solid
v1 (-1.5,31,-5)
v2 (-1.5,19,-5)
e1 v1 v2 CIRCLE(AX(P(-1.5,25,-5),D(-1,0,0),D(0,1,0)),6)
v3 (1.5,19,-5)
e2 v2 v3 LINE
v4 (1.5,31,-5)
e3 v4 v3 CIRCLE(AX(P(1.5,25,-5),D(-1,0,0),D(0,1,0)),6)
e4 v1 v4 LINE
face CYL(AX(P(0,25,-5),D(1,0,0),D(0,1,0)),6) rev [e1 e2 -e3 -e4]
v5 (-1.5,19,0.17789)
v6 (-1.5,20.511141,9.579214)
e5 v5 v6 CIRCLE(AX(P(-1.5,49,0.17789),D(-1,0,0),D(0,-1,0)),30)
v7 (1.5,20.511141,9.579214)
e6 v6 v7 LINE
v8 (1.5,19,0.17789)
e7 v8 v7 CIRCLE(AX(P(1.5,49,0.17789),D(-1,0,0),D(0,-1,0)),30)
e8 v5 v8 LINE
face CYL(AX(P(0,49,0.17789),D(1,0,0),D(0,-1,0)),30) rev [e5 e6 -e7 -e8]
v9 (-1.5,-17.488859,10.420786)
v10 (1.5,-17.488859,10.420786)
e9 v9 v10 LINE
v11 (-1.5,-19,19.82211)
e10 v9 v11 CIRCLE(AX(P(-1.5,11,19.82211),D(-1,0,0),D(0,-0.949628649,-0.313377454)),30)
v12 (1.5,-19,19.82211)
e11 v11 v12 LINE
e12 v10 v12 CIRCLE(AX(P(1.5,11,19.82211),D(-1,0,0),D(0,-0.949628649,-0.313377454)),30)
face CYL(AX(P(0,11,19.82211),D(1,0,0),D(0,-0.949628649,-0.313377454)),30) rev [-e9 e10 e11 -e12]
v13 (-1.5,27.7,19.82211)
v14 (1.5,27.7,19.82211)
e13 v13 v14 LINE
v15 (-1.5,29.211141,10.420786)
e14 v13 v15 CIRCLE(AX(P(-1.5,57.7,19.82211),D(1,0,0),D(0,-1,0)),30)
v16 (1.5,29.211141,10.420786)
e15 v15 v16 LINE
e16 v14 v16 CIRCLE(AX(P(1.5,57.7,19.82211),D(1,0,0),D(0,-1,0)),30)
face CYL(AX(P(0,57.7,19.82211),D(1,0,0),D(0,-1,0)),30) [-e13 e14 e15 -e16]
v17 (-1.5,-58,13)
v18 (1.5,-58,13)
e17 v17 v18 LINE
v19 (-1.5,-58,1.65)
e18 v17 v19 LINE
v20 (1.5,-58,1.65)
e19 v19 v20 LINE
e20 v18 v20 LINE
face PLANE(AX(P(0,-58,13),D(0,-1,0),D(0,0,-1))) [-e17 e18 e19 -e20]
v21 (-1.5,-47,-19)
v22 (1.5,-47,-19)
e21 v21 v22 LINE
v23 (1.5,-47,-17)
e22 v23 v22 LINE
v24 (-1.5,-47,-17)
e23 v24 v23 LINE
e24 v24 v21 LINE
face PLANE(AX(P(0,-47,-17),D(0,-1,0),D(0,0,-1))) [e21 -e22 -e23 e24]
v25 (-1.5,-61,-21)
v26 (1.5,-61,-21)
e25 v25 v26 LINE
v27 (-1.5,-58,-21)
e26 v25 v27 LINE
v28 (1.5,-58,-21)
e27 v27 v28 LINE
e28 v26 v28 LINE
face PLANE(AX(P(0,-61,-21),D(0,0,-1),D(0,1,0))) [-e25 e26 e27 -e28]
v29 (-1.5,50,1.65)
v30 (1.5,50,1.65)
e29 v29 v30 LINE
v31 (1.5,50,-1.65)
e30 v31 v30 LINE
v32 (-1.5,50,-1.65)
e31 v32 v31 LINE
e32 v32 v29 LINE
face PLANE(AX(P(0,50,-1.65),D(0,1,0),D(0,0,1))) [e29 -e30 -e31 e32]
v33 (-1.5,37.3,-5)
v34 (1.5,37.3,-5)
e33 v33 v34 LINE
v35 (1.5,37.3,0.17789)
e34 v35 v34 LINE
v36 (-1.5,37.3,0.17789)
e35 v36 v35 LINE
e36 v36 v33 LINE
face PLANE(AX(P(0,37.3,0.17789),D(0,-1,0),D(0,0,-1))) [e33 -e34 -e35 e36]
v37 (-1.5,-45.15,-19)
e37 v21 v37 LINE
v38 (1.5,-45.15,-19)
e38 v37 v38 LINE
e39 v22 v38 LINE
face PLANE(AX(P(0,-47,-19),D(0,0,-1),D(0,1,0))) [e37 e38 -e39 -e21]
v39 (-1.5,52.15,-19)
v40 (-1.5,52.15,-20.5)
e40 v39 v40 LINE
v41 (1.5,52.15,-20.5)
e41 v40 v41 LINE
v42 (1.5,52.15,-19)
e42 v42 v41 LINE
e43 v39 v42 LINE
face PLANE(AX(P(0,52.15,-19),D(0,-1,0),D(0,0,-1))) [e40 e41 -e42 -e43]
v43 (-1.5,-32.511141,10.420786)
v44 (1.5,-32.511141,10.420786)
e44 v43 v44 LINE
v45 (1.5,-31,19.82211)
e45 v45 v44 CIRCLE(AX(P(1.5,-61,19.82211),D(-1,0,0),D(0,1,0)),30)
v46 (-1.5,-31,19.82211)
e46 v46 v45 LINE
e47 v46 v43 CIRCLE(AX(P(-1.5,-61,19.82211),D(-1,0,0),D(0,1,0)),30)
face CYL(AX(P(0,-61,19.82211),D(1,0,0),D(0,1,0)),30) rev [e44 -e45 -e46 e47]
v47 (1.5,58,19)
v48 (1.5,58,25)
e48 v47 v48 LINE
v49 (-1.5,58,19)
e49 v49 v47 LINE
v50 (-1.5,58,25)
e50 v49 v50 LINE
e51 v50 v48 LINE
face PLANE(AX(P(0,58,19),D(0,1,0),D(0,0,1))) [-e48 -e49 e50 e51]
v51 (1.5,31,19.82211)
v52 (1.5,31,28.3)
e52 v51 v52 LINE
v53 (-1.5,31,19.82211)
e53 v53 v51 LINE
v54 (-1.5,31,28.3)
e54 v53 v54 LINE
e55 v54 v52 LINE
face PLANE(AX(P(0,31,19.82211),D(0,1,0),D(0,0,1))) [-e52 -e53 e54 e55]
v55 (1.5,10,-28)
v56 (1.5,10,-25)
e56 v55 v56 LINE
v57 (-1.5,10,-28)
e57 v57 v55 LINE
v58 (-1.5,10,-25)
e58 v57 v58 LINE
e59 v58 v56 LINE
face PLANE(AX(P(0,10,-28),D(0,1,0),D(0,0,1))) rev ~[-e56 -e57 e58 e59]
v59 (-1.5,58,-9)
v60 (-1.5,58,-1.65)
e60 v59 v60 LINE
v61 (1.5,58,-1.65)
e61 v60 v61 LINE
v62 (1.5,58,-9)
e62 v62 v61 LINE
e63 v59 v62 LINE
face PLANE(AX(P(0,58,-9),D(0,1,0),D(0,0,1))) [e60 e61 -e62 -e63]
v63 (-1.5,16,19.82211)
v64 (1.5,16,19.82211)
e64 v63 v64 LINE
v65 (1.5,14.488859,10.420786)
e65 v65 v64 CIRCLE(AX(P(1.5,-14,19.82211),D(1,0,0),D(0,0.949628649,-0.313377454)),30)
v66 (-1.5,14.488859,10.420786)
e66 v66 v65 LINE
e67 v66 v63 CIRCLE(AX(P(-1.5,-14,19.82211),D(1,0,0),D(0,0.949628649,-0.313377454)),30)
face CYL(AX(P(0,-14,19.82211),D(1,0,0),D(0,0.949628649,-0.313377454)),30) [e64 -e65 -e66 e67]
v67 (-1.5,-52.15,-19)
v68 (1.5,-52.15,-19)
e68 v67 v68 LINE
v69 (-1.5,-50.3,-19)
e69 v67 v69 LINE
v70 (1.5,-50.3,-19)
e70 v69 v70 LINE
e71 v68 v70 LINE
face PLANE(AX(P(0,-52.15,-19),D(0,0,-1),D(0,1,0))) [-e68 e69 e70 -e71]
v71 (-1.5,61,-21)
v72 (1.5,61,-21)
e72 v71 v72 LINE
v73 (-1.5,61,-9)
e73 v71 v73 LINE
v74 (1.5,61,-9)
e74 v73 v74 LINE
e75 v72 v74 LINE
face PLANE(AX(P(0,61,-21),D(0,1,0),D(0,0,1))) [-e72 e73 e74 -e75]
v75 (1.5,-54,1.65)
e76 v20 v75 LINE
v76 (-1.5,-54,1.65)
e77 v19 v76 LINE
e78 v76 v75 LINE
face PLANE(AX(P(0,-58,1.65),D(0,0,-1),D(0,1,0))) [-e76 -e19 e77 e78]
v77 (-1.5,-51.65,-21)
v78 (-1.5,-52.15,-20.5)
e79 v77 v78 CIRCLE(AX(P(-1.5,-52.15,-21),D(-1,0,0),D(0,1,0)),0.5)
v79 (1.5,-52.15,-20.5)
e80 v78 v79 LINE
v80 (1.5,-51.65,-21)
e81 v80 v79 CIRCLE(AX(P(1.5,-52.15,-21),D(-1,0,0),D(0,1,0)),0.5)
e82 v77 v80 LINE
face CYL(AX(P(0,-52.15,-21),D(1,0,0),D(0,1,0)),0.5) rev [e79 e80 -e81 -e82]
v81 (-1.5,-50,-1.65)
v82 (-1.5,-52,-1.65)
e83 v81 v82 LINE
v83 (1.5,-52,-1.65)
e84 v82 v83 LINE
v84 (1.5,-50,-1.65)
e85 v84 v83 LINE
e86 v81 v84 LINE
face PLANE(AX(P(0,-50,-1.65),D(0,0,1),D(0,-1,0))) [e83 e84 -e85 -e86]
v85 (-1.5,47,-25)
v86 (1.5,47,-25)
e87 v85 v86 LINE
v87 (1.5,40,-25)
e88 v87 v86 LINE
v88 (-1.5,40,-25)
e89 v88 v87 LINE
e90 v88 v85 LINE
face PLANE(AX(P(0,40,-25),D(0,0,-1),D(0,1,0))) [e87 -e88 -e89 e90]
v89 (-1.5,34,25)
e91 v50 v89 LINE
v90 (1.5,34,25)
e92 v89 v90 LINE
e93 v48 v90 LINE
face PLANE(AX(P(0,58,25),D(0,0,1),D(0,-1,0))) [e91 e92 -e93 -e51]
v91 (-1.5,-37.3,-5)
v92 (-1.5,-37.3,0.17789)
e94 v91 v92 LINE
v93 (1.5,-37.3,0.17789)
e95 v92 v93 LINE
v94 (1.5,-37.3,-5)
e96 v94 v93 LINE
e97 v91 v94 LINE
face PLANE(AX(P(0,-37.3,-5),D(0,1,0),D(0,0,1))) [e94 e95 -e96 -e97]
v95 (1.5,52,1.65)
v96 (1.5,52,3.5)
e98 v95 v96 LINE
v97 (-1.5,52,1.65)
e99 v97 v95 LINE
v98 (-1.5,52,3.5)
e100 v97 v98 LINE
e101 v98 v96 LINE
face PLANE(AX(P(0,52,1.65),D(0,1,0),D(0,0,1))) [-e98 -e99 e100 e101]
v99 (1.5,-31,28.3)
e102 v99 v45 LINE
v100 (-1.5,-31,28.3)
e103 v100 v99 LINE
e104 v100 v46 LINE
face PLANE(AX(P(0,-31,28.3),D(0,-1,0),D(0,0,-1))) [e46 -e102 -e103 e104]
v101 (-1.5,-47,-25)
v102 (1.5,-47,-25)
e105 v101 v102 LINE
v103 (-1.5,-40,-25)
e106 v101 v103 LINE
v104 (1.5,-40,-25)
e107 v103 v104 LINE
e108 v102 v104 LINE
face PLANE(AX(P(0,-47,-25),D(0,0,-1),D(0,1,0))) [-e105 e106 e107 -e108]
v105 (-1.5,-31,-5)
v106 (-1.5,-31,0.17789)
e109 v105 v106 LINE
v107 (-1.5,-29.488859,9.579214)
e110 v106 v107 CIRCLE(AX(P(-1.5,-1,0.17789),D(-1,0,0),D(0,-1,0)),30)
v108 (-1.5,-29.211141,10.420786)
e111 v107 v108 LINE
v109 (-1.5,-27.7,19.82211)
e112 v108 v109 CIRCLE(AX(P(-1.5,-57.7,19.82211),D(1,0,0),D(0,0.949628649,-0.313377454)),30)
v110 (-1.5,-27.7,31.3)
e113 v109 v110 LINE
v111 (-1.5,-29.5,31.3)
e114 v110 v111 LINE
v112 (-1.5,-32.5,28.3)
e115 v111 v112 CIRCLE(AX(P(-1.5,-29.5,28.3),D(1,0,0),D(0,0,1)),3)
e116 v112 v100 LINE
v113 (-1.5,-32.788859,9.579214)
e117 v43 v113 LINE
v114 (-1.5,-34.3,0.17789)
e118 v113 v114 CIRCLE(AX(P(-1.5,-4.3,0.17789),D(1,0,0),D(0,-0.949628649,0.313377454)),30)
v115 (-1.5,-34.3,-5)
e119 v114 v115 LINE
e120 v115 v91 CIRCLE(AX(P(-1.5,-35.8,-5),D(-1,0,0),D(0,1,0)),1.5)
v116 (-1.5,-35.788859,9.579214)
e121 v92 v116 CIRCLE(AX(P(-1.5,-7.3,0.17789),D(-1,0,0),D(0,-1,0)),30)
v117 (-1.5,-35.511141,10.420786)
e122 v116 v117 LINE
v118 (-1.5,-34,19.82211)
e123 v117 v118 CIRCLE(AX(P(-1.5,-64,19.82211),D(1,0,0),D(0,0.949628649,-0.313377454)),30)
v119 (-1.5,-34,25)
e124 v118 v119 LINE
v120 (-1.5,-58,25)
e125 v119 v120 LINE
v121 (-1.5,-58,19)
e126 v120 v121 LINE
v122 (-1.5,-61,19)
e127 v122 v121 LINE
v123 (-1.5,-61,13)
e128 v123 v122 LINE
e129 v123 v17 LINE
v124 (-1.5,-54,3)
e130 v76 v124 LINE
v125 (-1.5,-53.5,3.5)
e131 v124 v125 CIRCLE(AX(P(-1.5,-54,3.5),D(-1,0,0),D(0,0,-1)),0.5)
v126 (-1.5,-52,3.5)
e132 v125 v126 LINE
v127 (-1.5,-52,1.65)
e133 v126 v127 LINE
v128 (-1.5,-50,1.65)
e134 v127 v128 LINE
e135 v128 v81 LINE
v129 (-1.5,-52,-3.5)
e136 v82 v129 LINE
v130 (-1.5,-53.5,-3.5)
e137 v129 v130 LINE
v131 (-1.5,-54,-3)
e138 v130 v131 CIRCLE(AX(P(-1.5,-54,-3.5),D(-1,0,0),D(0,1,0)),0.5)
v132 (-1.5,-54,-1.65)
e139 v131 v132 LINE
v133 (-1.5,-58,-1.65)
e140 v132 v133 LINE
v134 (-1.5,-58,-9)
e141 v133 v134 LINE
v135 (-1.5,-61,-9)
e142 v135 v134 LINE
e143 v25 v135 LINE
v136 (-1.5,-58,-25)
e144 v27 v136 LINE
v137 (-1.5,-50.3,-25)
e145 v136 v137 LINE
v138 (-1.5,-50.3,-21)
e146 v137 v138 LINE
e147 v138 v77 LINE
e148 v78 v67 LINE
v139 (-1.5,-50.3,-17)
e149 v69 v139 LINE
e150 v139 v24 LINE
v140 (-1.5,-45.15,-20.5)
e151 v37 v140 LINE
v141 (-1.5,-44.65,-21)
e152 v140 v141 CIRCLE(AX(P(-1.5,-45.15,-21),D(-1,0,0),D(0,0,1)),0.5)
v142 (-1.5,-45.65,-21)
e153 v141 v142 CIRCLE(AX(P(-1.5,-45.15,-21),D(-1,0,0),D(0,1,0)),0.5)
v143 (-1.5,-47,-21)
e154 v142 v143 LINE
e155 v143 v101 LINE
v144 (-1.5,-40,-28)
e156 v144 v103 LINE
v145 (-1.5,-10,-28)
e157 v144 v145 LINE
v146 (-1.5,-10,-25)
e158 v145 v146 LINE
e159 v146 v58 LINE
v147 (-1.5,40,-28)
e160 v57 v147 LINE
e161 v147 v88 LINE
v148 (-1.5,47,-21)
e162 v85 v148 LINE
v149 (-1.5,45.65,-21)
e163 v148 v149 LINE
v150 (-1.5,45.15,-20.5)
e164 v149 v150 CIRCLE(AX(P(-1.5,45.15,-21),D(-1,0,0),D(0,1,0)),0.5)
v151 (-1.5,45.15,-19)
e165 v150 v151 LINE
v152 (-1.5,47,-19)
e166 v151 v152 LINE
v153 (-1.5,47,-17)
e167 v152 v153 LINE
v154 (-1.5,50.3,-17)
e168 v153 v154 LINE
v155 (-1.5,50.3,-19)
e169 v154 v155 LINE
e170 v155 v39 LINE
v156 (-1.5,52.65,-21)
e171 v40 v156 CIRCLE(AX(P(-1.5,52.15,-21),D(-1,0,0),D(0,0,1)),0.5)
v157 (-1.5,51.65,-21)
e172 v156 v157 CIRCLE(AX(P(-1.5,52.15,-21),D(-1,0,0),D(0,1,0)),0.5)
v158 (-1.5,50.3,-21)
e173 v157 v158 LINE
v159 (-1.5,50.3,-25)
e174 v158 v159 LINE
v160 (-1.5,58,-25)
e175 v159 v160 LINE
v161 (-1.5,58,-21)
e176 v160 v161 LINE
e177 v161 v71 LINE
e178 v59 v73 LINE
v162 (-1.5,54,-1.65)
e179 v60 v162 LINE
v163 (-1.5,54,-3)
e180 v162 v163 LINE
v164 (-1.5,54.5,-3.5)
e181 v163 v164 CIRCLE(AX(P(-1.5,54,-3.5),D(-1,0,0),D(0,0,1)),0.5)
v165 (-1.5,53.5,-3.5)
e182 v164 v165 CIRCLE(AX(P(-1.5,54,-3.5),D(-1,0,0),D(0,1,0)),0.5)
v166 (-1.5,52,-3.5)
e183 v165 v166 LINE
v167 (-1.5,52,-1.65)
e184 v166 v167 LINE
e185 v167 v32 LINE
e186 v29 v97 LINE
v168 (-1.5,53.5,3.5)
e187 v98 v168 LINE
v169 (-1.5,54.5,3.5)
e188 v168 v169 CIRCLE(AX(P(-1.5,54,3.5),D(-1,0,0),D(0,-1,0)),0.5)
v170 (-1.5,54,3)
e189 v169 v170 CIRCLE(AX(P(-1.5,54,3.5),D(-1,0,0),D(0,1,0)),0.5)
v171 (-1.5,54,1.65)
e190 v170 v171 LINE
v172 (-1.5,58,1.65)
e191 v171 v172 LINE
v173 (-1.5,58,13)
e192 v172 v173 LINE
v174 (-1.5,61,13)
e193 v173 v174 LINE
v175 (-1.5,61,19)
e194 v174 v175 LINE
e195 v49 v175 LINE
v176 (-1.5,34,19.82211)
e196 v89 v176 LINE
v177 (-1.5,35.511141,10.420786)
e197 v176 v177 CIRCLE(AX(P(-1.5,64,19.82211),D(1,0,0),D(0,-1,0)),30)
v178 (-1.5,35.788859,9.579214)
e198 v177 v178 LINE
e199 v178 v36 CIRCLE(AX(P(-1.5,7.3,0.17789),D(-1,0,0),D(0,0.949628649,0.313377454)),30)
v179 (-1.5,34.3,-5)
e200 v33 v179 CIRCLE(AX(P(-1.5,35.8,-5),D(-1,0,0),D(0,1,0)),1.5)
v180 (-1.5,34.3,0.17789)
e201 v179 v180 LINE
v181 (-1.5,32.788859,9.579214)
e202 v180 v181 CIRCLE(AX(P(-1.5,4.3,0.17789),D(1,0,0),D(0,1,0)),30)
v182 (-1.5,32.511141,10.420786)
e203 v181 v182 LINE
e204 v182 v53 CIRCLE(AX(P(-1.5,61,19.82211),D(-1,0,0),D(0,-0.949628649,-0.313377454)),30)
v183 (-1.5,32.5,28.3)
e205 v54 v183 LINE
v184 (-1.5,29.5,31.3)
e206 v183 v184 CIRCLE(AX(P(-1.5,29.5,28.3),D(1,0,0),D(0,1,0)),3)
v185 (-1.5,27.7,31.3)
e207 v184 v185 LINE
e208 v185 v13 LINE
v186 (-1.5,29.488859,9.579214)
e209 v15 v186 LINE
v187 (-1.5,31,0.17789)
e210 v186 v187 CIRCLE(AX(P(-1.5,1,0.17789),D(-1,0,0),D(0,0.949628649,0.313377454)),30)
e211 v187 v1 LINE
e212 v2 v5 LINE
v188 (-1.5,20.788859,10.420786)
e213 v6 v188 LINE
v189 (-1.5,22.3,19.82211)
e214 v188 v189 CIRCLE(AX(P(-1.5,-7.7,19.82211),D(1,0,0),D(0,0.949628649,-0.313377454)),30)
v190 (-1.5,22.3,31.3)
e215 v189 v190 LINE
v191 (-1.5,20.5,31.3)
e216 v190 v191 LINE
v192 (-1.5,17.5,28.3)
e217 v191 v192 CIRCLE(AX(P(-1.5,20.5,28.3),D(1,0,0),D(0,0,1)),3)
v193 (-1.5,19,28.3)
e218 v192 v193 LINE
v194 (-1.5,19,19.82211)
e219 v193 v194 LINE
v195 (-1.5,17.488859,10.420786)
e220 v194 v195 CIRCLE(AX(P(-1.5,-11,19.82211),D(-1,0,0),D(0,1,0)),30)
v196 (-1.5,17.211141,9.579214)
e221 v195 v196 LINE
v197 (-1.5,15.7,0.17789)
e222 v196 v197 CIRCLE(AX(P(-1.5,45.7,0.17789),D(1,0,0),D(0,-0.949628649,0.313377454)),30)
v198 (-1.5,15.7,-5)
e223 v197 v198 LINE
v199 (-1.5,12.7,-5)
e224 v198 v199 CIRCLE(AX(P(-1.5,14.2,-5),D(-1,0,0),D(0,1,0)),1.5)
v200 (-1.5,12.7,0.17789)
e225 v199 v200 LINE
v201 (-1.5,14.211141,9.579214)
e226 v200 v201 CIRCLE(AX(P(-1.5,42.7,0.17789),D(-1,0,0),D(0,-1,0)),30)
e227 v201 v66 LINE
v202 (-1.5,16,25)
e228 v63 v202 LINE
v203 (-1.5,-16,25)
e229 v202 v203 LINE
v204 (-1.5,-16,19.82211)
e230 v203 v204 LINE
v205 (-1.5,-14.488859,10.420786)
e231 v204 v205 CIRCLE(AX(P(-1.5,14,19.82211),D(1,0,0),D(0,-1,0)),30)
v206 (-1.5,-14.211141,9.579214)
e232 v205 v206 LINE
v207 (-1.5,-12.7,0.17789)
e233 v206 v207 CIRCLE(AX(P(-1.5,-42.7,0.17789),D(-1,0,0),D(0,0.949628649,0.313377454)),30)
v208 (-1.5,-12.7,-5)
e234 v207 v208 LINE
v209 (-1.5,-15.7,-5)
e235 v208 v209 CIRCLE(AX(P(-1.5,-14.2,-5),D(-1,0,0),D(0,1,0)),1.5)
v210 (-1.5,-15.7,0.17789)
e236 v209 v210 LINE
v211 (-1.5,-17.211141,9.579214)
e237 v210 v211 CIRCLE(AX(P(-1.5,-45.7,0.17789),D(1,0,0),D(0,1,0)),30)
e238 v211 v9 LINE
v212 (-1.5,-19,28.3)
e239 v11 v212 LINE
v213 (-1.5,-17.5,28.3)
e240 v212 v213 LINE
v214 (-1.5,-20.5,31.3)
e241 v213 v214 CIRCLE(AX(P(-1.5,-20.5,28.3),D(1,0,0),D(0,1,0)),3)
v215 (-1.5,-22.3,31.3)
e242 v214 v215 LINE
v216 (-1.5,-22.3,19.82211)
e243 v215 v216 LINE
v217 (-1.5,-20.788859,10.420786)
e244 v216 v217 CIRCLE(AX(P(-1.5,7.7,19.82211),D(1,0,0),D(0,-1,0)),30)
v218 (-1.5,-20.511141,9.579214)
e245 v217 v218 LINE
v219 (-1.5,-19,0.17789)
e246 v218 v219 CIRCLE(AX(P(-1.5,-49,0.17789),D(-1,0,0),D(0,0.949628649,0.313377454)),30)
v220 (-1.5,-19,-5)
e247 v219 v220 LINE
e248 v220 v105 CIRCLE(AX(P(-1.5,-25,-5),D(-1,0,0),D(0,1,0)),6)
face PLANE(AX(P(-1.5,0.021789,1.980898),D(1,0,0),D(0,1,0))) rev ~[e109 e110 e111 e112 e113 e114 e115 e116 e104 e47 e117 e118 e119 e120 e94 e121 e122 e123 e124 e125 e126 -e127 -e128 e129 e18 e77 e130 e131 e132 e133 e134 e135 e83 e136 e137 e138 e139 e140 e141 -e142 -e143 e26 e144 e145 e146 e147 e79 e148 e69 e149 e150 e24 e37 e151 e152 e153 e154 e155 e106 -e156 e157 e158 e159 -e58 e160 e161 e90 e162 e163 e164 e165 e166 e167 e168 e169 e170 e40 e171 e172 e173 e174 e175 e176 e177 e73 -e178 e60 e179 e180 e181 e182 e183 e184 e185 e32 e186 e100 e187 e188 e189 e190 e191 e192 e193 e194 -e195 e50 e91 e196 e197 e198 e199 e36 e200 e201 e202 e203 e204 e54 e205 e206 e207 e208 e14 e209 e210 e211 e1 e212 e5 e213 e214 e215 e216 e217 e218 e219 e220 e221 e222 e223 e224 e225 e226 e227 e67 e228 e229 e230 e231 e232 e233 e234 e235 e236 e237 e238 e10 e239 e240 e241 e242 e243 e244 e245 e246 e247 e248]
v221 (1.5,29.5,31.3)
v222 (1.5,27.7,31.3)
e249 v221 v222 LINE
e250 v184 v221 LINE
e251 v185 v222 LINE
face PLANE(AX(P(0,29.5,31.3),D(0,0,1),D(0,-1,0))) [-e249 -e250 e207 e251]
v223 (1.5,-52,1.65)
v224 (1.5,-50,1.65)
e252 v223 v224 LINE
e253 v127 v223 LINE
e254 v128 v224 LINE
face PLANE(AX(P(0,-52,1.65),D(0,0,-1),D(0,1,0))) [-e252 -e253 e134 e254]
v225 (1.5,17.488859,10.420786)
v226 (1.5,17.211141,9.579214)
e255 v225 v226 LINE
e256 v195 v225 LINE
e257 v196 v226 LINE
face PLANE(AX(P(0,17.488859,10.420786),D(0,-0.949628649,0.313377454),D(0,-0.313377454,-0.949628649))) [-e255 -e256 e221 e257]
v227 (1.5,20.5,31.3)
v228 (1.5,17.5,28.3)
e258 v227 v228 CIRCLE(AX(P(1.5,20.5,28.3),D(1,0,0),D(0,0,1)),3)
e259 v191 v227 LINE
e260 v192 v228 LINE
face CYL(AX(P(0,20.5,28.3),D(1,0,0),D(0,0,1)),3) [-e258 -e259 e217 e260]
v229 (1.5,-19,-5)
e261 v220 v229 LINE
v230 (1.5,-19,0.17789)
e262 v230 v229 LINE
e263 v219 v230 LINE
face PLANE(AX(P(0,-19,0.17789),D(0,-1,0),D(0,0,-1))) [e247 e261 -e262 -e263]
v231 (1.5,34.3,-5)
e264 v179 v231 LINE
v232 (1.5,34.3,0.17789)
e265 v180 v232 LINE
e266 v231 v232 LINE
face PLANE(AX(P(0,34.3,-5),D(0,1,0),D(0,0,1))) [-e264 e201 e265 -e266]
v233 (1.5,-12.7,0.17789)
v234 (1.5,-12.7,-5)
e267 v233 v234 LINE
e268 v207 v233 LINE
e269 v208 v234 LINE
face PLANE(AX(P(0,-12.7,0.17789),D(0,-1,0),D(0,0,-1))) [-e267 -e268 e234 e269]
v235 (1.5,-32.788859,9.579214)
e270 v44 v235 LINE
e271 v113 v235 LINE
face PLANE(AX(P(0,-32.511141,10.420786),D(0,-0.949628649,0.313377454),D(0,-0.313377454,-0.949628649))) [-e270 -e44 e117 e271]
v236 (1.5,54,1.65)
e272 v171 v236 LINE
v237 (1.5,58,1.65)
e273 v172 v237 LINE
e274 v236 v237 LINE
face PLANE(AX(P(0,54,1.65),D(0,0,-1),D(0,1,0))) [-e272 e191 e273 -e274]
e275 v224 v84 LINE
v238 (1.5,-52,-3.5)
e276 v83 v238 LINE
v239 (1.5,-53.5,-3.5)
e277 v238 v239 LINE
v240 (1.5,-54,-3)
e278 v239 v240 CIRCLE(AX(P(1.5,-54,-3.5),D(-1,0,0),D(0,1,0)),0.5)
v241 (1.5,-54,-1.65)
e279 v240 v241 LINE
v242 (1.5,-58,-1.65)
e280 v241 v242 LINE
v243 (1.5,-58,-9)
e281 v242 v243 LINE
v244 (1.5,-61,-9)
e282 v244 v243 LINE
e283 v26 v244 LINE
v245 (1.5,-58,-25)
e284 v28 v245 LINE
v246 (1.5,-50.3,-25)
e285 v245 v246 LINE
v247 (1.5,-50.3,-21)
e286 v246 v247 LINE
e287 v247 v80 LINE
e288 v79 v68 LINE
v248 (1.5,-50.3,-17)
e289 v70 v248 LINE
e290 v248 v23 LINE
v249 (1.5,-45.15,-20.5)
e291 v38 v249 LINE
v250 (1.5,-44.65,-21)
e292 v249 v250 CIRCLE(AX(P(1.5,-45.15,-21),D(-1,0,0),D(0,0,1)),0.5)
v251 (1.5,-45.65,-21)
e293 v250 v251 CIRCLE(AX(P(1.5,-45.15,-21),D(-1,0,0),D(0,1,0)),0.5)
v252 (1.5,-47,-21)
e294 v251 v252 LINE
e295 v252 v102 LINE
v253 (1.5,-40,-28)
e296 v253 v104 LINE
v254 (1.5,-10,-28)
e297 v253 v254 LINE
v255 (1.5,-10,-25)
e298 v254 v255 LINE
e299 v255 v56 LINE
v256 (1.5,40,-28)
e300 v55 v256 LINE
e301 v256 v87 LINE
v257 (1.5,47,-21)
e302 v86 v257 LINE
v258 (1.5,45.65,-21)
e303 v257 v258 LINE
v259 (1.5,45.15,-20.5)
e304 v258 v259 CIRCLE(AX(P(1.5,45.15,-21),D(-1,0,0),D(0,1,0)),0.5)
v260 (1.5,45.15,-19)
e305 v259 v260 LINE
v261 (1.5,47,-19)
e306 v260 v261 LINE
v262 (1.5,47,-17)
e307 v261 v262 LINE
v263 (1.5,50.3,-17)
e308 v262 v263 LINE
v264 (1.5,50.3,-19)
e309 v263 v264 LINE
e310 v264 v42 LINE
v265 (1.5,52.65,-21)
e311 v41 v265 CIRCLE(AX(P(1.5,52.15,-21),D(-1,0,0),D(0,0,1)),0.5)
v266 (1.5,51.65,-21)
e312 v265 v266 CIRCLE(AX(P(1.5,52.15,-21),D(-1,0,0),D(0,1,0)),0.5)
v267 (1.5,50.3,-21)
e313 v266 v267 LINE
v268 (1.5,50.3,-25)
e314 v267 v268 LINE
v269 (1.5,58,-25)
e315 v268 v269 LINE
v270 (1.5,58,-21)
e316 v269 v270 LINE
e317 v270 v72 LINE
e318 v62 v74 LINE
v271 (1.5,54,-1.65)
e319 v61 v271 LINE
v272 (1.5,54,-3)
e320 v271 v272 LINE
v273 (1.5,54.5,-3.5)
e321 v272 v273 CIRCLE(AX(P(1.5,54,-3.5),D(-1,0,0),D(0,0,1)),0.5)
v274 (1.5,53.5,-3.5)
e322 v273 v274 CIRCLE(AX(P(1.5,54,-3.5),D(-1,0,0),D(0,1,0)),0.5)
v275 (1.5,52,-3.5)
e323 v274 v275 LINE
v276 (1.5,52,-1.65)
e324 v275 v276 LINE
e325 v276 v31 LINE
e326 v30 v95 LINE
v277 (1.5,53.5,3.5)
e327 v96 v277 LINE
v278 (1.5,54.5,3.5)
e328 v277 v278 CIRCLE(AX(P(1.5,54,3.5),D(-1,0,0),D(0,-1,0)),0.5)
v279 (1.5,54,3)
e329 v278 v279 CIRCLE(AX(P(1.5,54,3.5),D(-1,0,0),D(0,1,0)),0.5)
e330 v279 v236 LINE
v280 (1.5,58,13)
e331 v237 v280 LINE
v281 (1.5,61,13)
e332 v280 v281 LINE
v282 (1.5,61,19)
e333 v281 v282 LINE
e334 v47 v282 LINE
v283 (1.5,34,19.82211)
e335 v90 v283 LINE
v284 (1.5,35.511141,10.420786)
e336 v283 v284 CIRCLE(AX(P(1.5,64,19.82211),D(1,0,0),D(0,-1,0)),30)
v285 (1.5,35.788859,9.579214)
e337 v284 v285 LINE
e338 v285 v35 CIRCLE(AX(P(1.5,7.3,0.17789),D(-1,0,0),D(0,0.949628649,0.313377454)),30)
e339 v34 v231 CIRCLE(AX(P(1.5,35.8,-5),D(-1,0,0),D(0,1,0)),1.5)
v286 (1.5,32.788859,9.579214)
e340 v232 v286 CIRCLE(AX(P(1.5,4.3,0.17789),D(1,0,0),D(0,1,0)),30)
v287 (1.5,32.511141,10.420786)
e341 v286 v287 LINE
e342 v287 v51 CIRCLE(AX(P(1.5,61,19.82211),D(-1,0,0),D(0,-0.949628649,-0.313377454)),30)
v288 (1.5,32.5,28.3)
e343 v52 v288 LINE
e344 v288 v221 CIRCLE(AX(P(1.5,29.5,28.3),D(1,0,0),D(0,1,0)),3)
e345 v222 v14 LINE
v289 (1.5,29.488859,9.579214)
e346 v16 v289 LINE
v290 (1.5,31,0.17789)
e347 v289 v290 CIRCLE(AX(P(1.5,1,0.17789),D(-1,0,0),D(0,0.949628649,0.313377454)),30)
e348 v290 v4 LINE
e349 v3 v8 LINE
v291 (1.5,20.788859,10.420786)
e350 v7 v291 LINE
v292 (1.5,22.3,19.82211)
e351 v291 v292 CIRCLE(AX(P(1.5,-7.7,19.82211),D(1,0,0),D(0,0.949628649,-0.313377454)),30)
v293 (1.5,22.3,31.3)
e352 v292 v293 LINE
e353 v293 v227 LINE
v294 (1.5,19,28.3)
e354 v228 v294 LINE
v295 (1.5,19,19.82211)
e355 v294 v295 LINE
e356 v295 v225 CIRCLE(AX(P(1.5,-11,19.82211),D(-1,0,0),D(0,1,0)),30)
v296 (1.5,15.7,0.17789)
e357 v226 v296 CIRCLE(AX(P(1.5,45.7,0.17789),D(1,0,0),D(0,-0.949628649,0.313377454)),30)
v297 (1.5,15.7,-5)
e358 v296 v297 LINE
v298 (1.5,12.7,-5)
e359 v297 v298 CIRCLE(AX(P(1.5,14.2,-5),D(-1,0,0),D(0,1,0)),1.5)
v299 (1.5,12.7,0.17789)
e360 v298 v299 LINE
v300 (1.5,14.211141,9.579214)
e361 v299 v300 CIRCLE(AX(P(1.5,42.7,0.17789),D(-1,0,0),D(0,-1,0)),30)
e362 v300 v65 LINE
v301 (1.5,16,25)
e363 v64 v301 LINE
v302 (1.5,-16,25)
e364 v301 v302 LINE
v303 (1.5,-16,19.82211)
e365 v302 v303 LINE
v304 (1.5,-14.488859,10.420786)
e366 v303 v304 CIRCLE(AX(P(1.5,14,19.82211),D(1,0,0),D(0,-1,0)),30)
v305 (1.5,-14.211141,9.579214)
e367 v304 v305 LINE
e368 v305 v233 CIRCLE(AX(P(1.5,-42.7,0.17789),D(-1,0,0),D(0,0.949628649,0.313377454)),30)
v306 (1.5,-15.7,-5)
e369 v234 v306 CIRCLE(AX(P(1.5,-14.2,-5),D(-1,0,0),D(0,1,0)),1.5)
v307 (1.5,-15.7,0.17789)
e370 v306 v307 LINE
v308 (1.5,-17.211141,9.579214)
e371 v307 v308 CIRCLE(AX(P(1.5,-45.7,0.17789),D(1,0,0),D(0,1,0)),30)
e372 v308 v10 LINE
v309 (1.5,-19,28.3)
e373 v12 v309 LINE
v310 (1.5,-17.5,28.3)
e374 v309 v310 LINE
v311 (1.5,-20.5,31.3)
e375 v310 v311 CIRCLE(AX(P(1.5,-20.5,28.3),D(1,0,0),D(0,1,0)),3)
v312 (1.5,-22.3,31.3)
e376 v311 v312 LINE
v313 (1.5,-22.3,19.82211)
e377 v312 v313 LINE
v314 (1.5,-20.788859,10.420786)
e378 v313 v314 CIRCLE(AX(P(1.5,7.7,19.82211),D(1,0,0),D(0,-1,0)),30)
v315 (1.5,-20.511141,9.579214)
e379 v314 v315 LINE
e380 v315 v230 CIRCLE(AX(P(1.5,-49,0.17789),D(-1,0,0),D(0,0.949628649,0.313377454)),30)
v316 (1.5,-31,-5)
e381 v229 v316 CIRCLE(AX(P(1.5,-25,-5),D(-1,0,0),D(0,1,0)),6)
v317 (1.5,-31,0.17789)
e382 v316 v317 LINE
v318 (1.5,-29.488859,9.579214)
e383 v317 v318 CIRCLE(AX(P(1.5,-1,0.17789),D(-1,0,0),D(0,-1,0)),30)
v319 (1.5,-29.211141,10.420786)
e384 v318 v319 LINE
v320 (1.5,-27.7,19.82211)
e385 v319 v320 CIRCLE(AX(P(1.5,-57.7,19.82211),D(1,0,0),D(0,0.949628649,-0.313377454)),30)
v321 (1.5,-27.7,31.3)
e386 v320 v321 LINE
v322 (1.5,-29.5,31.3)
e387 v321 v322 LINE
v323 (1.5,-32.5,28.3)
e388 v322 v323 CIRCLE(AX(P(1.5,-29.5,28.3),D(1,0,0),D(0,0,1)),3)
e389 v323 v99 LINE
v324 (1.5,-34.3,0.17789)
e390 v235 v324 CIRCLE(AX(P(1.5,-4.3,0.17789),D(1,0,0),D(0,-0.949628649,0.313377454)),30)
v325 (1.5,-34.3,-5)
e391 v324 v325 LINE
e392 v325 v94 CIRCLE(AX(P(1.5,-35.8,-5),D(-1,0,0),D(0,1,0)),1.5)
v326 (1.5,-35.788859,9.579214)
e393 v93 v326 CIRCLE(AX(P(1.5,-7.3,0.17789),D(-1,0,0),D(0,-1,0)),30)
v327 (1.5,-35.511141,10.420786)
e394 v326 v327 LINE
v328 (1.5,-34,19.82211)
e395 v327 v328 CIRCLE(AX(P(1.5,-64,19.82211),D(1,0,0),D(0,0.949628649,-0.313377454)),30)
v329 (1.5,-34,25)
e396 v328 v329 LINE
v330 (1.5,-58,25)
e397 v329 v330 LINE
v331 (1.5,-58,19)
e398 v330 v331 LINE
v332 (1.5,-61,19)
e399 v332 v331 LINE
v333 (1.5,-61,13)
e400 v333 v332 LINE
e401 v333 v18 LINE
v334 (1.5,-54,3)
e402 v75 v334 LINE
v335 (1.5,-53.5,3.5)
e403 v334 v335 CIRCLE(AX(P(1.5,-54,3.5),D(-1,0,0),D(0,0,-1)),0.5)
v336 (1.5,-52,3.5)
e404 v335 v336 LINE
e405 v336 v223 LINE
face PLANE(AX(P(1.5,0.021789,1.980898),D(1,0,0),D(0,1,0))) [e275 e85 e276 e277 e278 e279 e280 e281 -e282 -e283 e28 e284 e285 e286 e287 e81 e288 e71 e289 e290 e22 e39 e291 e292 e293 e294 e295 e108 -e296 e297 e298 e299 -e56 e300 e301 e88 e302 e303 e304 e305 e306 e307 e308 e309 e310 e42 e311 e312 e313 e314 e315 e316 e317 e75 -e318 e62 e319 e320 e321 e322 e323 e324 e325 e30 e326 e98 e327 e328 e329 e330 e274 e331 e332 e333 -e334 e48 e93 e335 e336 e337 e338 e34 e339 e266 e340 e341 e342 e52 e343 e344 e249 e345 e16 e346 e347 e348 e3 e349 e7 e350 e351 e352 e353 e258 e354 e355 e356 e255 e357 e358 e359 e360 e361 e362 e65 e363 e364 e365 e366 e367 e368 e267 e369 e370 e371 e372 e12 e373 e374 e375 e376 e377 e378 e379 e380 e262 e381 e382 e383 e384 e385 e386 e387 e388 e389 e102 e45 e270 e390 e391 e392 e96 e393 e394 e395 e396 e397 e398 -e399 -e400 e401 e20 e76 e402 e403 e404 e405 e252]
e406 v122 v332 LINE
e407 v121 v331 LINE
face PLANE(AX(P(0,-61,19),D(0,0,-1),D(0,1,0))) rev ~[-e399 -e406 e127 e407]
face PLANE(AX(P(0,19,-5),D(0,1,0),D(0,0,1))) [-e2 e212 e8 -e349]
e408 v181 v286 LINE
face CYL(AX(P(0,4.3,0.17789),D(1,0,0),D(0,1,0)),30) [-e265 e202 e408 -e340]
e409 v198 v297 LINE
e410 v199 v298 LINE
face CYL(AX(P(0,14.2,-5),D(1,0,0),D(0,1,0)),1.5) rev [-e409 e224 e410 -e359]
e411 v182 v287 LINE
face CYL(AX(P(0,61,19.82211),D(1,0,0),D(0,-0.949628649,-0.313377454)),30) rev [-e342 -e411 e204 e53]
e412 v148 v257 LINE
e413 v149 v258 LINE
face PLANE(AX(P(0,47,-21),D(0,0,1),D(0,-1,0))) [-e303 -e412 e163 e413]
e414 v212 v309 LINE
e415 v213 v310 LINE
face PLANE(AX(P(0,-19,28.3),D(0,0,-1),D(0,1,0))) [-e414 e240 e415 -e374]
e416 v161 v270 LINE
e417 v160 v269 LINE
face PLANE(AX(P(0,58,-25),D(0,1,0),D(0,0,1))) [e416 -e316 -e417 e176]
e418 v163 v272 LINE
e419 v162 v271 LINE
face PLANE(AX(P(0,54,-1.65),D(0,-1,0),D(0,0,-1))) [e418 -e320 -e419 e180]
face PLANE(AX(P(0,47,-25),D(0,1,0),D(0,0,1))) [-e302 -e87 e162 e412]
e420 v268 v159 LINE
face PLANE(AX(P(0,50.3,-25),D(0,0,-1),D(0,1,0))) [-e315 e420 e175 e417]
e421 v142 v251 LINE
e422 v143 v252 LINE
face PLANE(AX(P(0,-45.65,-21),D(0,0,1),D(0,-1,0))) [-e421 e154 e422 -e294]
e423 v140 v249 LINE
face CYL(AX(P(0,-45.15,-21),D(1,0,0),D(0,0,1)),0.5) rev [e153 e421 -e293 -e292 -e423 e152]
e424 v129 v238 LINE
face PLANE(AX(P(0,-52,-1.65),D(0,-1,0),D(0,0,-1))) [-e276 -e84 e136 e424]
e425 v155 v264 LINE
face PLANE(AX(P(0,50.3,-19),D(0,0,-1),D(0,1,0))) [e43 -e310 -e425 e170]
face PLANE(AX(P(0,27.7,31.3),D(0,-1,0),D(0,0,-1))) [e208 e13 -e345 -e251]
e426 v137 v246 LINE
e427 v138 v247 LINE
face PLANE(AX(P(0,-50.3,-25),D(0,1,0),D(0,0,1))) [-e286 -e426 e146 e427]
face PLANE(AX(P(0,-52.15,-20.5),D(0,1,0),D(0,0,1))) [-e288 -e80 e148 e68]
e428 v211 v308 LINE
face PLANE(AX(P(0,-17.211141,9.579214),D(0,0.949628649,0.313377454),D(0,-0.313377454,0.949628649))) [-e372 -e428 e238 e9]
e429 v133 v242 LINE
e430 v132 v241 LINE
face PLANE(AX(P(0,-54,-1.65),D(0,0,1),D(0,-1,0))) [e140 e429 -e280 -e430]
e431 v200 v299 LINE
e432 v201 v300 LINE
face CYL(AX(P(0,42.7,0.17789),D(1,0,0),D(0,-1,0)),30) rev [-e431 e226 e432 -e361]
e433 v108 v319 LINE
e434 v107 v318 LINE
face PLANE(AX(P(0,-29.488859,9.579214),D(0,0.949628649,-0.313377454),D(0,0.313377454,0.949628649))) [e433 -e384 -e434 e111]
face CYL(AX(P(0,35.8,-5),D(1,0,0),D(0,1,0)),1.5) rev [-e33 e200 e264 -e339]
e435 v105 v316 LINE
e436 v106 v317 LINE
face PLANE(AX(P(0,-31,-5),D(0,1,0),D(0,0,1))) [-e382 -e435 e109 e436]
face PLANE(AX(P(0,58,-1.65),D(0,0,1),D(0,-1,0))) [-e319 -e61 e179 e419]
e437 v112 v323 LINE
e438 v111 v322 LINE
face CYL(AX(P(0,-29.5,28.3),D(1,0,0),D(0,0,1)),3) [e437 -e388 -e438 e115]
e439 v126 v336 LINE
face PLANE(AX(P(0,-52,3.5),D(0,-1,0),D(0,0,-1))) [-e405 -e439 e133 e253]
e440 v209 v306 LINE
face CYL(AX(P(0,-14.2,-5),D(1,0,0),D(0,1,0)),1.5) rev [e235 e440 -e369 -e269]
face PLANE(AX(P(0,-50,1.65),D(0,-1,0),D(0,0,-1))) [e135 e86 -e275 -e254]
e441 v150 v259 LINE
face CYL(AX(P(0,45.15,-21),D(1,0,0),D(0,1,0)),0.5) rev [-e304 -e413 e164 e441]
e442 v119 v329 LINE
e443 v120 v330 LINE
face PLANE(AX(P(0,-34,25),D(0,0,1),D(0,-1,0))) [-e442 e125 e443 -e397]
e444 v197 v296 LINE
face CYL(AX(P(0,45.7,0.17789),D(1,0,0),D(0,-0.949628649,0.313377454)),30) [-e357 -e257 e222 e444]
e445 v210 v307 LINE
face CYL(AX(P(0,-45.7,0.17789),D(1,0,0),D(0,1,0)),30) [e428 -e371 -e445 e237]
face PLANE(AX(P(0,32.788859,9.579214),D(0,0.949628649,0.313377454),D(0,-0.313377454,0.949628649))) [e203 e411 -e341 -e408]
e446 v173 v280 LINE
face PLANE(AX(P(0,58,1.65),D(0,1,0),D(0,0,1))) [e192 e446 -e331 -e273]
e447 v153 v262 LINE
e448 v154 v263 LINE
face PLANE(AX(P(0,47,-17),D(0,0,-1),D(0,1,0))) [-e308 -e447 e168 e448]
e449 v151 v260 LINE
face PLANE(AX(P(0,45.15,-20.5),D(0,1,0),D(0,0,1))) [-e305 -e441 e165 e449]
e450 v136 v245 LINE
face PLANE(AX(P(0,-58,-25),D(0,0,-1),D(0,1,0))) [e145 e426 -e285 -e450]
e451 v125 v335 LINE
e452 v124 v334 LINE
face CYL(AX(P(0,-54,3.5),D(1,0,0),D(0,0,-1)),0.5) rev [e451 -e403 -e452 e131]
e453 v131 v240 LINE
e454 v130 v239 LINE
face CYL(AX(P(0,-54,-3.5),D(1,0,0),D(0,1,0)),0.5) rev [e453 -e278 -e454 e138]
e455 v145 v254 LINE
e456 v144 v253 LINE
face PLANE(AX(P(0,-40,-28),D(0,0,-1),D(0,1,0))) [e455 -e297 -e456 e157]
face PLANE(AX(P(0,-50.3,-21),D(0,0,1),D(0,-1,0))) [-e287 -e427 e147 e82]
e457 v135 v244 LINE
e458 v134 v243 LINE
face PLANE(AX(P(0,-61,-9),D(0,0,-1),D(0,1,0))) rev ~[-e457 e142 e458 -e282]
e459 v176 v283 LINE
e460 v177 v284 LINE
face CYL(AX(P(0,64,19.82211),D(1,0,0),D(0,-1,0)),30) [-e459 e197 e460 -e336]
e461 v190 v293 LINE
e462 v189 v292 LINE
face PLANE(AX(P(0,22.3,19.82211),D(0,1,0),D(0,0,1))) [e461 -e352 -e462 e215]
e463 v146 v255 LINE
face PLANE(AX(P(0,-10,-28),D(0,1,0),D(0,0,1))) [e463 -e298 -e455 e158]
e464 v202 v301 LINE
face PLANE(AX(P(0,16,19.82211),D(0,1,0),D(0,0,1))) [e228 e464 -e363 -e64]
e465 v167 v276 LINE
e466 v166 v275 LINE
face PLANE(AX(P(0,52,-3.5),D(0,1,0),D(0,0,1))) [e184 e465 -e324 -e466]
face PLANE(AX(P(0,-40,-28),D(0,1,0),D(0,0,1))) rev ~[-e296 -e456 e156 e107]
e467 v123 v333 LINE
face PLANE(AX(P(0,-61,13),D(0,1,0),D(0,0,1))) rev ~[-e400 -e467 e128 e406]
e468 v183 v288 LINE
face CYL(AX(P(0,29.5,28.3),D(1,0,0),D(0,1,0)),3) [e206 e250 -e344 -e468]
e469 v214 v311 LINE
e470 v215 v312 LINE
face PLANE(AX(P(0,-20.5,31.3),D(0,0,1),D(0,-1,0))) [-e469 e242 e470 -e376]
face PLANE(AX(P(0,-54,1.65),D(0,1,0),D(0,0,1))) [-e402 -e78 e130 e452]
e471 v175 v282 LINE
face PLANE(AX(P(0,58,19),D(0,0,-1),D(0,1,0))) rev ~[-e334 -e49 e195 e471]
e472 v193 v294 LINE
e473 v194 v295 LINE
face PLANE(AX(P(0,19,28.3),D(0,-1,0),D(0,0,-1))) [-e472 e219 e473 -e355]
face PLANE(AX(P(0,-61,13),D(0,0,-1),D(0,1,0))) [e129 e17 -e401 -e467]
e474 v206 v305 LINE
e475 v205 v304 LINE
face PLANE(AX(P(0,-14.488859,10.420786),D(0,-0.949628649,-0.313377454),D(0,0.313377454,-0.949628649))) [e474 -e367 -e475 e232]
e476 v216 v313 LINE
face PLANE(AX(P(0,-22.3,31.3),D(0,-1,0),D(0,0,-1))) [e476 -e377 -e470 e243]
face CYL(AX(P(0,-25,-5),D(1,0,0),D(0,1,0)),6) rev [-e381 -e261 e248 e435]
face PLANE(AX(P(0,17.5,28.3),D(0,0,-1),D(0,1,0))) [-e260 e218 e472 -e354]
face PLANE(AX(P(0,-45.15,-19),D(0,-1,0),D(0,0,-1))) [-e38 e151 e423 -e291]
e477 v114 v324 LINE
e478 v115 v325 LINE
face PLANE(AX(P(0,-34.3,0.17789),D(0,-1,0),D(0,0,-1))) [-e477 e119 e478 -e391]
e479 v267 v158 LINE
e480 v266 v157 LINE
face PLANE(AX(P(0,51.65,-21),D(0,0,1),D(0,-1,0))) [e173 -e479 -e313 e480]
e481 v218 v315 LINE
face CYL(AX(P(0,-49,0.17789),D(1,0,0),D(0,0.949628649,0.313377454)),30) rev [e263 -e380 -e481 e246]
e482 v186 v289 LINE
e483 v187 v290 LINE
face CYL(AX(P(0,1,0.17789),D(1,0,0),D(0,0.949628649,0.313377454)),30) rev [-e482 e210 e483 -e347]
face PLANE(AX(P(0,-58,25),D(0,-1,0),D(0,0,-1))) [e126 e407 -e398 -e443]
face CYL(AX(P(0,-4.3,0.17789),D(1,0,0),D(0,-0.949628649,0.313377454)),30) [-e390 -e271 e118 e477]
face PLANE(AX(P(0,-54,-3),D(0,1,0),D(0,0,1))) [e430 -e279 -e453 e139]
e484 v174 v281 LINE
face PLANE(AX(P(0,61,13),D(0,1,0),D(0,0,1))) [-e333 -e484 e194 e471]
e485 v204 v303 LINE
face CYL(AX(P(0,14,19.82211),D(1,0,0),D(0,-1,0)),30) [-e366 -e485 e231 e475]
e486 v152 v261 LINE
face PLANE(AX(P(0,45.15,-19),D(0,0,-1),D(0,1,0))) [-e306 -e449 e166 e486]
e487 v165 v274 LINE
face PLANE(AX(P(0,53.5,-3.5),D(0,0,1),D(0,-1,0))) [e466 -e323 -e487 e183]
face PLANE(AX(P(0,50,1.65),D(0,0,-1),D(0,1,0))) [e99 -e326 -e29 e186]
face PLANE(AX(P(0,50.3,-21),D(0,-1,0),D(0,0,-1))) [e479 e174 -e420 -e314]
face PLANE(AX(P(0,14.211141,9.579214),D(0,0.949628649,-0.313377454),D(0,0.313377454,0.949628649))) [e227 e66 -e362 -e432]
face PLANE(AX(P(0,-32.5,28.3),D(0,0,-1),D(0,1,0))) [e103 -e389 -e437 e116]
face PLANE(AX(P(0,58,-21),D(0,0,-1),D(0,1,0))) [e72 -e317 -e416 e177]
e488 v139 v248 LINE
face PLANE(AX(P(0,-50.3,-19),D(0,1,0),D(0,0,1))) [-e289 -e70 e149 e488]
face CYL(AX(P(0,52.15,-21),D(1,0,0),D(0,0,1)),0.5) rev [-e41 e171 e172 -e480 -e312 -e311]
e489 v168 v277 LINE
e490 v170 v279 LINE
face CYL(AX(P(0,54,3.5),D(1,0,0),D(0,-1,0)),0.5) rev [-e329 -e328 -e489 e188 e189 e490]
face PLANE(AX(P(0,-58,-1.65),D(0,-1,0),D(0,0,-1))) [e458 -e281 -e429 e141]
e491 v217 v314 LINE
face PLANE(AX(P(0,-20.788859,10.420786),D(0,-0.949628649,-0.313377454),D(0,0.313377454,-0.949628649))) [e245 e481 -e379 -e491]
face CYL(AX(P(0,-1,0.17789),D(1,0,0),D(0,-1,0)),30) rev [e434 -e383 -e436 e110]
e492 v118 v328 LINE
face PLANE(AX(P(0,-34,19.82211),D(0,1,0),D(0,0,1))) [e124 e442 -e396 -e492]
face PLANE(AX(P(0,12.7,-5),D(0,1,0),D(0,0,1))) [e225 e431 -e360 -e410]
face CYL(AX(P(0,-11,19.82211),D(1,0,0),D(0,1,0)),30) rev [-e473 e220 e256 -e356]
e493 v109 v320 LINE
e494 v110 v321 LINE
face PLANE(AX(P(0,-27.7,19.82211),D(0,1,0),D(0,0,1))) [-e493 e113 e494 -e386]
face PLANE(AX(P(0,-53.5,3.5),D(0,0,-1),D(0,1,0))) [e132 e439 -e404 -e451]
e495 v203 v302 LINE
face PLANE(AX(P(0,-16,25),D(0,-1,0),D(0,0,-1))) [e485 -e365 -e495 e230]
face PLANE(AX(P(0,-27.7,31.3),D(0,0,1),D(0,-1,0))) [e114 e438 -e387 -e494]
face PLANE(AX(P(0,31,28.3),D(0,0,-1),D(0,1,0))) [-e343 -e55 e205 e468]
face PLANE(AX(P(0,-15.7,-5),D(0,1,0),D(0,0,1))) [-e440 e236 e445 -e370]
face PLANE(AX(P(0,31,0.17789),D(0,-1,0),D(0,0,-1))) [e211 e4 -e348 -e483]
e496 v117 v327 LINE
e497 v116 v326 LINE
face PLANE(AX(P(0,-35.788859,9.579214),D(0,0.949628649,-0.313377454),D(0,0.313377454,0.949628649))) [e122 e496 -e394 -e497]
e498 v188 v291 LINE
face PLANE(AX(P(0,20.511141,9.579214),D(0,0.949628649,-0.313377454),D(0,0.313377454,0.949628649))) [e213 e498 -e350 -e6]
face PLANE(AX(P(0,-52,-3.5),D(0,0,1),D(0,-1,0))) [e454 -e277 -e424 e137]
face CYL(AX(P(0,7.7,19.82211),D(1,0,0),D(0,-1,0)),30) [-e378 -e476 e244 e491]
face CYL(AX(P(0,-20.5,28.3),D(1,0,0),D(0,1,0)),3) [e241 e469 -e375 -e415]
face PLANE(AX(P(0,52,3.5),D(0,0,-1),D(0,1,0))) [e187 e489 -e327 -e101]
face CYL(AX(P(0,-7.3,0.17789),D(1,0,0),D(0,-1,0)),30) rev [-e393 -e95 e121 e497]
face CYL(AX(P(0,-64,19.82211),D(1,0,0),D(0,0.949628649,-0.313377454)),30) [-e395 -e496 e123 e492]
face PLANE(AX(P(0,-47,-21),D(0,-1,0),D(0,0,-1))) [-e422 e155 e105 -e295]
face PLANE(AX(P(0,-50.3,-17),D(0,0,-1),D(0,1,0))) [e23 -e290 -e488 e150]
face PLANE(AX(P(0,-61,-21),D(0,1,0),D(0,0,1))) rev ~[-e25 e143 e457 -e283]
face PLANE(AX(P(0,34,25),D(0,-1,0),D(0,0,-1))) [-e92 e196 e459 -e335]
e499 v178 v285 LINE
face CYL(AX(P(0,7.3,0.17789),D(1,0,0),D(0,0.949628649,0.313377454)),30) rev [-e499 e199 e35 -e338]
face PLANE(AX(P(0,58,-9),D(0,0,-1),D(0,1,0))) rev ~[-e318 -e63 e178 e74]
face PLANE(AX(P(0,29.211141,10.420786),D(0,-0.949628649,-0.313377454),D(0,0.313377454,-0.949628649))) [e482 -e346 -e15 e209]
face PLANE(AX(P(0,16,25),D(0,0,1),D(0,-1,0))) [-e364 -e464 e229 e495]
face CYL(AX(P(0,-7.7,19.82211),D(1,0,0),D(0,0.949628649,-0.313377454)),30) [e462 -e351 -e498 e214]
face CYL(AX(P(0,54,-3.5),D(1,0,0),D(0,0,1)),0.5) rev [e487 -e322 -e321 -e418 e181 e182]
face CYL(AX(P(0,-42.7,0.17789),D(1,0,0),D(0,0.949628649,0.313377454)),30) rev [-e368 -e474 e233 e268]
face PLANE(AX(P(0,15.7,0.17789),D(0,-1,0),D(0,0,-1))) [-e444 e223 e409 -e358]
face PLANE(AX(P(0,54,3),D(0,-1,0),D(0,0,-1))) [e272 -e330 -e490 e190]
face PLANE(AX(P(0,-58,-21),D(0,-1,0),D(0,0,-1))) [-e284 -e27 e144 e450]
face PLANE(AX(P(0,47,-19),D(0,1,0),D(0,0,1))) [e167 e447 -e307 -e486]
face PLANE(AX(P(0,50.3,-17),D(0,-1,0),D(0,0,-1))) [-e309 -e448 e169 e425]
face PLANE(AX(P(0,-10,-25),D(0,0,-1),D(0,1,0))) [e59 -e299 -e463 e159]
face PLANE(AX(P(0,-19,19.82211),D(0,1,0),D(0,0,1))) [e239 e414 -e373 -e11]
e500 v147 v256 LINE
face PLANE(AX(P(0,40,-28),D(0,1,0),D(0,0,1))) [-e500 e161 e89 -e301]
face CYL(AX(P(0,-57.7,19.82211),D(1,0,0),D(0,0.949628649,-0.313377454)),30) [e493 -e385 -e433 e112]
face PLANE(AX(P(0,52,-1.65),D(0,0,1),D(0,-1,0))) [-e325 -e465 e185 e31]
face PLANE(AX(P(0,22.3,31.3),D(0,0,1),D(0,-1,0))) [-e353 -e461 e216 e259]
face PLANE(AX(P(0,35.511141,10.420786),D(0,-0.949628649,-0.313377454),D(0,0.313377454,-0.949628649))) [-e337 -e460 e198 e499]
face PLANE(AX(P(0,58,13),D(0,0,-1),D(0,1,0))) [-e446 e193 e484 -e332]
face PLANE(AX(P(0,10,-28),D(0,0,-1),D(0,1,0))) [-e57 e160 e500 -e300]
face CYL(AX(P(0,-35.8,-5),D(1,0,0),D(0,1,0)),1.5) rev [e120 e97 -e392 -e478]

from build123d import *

# Parameters (mm, degrees)
F0_W     = 3
F0_H     = 6
F0_H_2   = 12
F0_W_2   = 30
F0_H_3   = 3
F1_DEPTH = 1.5


# Not quite as in the source:
# - a feature names something its author has since deleted; it is built from what else it names


with BuildPart() as f1:
    # F0 (on Right) → F1 (new body, symmetric)
    with BuildSketch(Plane.YZ):
        with BuildLine():
            Line((50.3, -25), (58, -25))
            Line((58, -25), (58, -21))
            Line((58, -21), (58, -9))
            Line((58, -9), (58, -1.65))
            Line((58, -1.65), (54, -1.65))
            Line((54, -1.65), (54, -3))
            ThreePointArc((54, -3), (54.3535533906, -3.1464466094), (54.5, -3.5))
            ThreePointArc((54.5, -3.5), (54, -4), (53.5, -3.5))
            Line((53.5, -3.5), (52, -3.5))
            Line((52, -3.5), (52, -1.65))
            Line((52, -1.65), (50, -1.65))
            Line((50, -1.65), (50, 1.65))
            Line((50, 1.65), (52, 1.65))
            Line((52, 1.65), (52, 3.5))
            Line((52, 3.5), (53.5, 3.5))
            ThreePointArc((53.5, 3.5), (54, 4), (54.5, 3.5))
            ThreePointArc((54.5, 3.5), (54.3535533906, 3.1464466094), (54, 3))
            Line((54, 3), (54, 1.65))
            Line((54, 1.65), (58, 1.65))
            Line((58, 1.65), (58, 13))
            Line((58, 13), (58, 19))
            Line((58, 19), (58, 25))
            Line((58, 25), (34, 25))
            Line((34, 25), (34, 19.8221099082))
            ThreePointArc((34, 19.8221099082), (34.3801942596, 15.0611112835), (35.5111405269, 10.4207862821))
            Line((35.5111405269, 10.4207862821), (35.7888594731, 9.5792137179))
            ThreePointArc((35.7888594731, 9.5792137179), (36.9198057404, 4.9388887165), (37.3, 0.1778900918))
            Line((37.3, 0.1778900918), (37.3, -5))
            ThreePointArc((37.3, -5), (35.8, -6.5), (34.3, -5))
            Line((34.3, -5), (34.3, 0.1778900918))
            ThreePointArc((34.3, 0.1778900918), (33.9198057404, 4.9388887165), (32.7888594731, 9.5792137179))
            Line((32.7888594731, 9.5792137179), (32.5111405269, 10.4207862821))
            ThreePointArc((32.5111405269, 10.4207862821), (31.3801942596, 15.0611112835), (31, 19.8221099082))
            Line((31, 19.8221099082), (31, 25))
            Line((31, 25), (27.7, 25))
            Line((27.7, 25), (27.7, 19.8221099082))
            ThreePointArc((27.7, 19.8221099082), (28.0801942596, 15.0611112835), (29.2111405269, 10.4207862821))
            Line((29.2111405269, 10.4207862821), (29.4888594731, 9.5792137179))
            ThreePointArc((29.4888594731, 9.5792137179), (30.6198057404, 4.9388887165), (31, 0.1778900918))
            Line((31, 0.1778900918), (31, -5))
            ThreePointArc((31, -5), (25, -11), (19, -5))
            Line((19, -5), (19, 0.1778900918))
            ThreePointArc((19, 0.1778900918), (19.3801942596, 4.9388887165), (20.5111405269, 9.5792137179))
            Line((20.5111405269, 9.5792137179), (20.7888594731, 10.4207862821))
            ThreePointArc((20.7888594731, 10.4207862821), (21.9198057404, 15.0611112835), (22.3, 19.8221099082))
            Line((22.3, 19.8221099082), (22.3, 25))
            Line((22.3, 25), (19, 25))
            Line((19, 25), (19, 19.8221099082))
            ThreePointArc((19, 19.8221099082), (18.6198057404, 15.0611112835), (17.4888594731, 10.4207862821))
            Line((17.4888594731, 10.4207862821), (17.2111405269, 9.5792137179))
            ThreePointArc((17.2111405269, 9.5792137179), (16.0801942596, 4.9388887165), (15.7, 0.1778900918))
            Line((15.7, 0.1778900918), (15.7, -5))
            ThreePointArc((15.7, -5), (14.2, -6.5), (12.7, -5))
            Line((12.7, -5), (12.7, 0.1778900918))
            ThreePointArc((12.7, 0.1778900918), (13.0801942596, 4.9388887165), (14.2111405269, 9.5792137179))
            Line((14.2111405269, 9.5792137179), (14.4888594731, 10.4207862821))
            ThreePointArc((14.4888594731, 10.4207862821), (15.6198057404, 15.0611112835), (16, 19.8221099082))
            Line((16, 19.8221099082), (16, 25))
            Line((16, 25), (-16, 25))
            Line((-16, 25), (-16, 19.8221099082))
            ThreePointArc((-16, 19.8221099082), (-15.6198057404, 15.0611112835), (-14.4888594731, 10.4207862821))
            Line((-14.4888594731, 10.4207862821), (-14.2111405269, 9.5792137179))
            ThreePointArc((-14.2111405269, 9.5792137179), (-13.0801942596, 4.9388887165), (-12.7, 0.1778900918))
            Line((-12.7, 0.1778900918), (-12.7, -5))
            ThreePointArc((-12.7, -5), (-14.2, -6.5), (-15.7, -5))
            Line((-15.7, -5), (-15.7, 0.1778900918))
            ThreePointArc((-15.7, 0.1778900918), (-16.0801942596, 4.9388887165), (-17.2111405269, 9.5792137179))
            Line((-17.2111405269, 9.5792137179), (-17.4888594731, 10.4207862821))
            ThreePointArc((-17.4888594731, 10.4207862821), (-18.6198057404, 15.0611112835), (-19, 19.8221099082))
            Line((-19, 19.8221099082), (-19, 25))
            Line((-19, 25), (-22.3, 25))
            Line((-22.3, 25), (-22.3, 19.8221099082))
            ThreePointArc((-22.3, 19.8221099082), (-21.9198057404, 15.0611112835), (-20.7888594731, 10.4207862821))
            Line((-20.7888594731, 10.4207862821), (-20.5111405269, 9.5792137179))
            ThreePointArc((-20.5111405269, 9.5792137179), (-19.3801942596, 4.9388887165), (-19, 0.1778900918))
            Line((-19, 0.1778900918), (-19, -5))
            ThreePointArc((-19, -5), (-25, -11), (-31, -5))
            Line((-31, -5), (-31, 0.1778900918))
            ThreePointArc((-31, 0.1778900918), (-30.6198057404, 4.9388887165), (-29.4888594731, 9.5792137179))
            Line((-29.4888594731, 9.5792137179), (-29.2111405269, 10.4207862821))
            ThreePointArc((-29.2111405269, 10.4207862821), (-28.0801942596, 15.0611112835), (-27.7, 19.8221099082))
            Line((-27.7, 19.8221099082), (-27.7, 25))
            Line((-27.7, 25), (-31, 25))
            Line((-31, 25), (-31, 19.8221099082))
            ThreePointArc((-31, 19.8221099082), (-31.3801942596, 15.0611112835), (-32.5111405269, 10.4207862821))
            Line((-32.5111405269, 10.4207862821), (-32.7888594731, 9.5792137179))
            ThreePointArc((-32.7888594731, 9.5792137179), (-33.9198057404, 4.9388887165), (-34.3, 0.1778900918))
            Line((-34.3, 0.1778900918), (-34.3, -5))
            ThreePointArc((-34.3, -5), (-35.8, -6.5), (-37.3, -5))
            Line((-37.3, -5), (-37.3, 0.1778900918))
            ThreePointArc((-37.3, 0.1778900918), (-36.9198057404, 4.9388887165), (-35.7888594731, 9.5792137179))
            Line((-35.7888594731, 9.5792137179), (-35.5111405269, 10.4207862821))
            ThreePointArc((-35.5111405269, 10.4207862821), (-34.3801942596, 15.0611112835), (-34, 19.8221099082))
            Line((-34, 19.8221099082), (-34, 25))
            Line((-34, 25), (-58, 25))
            Line((-58, 25), (-58, 19))
            Line((-58, 19), (-58, 13))
            Line((-58, 13), (-58, 1.65))
            Line((-58, 1.65), (-54, 1.65))
            Line((-54, 1.65), (-54, 3))
            ThreePointArc((-54, 3), (-54.3535533906, 3.8535533906), (-53.5, 3.5))
            Line((-53.5, 3.5), (-52, 3.5))
            Line((-52, 3.5), (-52, 1.65))
            Line((-52, 1.65), (-50, 1.65))
            Line((-50, 1.65), (-50, -1.65))
            Line((-50, -1.65), (-52, -1.65))
            Line((-52, -1.65), (-52, -3.5))
            Line((-52, -3.5), (-53.5, -3.5))
            ThreePointArc((-53.5, -3.5), (-54.3535533906, -3.8535533906), (-54, -3))
            Line((-54, -3), (-54, -1.65))
            Line((-54, -1.65), (-58, -1.65))
            Line((-58, -1.65), (-58, -9))
            Line((-58, -9), (-58, -21))
            Line((-58, -21), (-58, -25))
            Line((-58, -25), (-50.3, -25))
            Line((-50.3, -25), (-50.3, -21))
            Line((-50.3, -21), (-51.65, -21))
            ThreePointArc((-51.65, -21), (-52.5035533906, -21.3535533906), (-52.15, -20.5))
            Line((-52.15, -20.5), (-52.15, -19))
            Line((-52.15, -19), (-50.3, -19))
            Line((-50.3, -19), (-50.3, -17))
            Line((-50.3, -17), (-47, -17))
            Line((-47, -17), (-47, -19))
            Line((-47, -19), (-45.15, -19))
            Line((-45.15, -19), (-45.15, -20.5))
            ThreePointArc((-45.15, -20.5), (-44.7964466094, -20.6464466094), (-44.65, -21))
            ThreePointArc((-44.65, -21), (-45.15, -21.5), (-45.65, -21))
            Line((-45.65, -21), (-47, -21))
            Line((-47, -21), (-47, -25))
            Line((-47, -25), (-40, -25))
            Line((-40, -25), (-10, -25))
            Line((-10, -25), (10, -25))
            Line((10, -25), (40, -25))
            Line((40, -25), (47, -25))
            Line((47, -25), (47, -21))
            Line((47, -21), (45.65, -21))
            ThreePointArc((45.65, -21), (44.7964466094, -21.3535533906), (45.15, -20.5))
            Line((45.15, -20.5), (45.15, -19))
            Line((45.15, -19), (47, -19))
            Line((47, -19), (47, -17))
            Line((47, -17), (50.3, -17))
            Line((50.3, -17), (50.3, -19))
            Line((50.3, -19), (52.15, -19))
            Line((52.15, -19), (52.15, -20.5))
            ThreePointArc((52.15, -20.5), (52.5035533906, -20.6464466094), (52.65, -21))
            ThreePointArc((52.65, -21), (52.15, -21.5), (51.65, -21))
            Line((51.65, -21), (50.3, -21))
            Line((50.3, -21), (50.3, -25))
        make_face()
        with Locations((-59.5, 16)):
            Rectangle(F0_W, F0_H)
        with Locations((-59.5, -15)):
            Rectangle(F0_W, F0_H_2)
        with Locations((59.5, 16)):
            Rectangle(F0_W, F0_H)
        with Locations((59.5, -15)):
            Rectangle(F0_W, F0_H_2)
        with Locations((25, -26.5)):
            Rectangle(F0_W_2, F0_H_3)
        with Locations((-25, -26.5)):
            Rectangle(F0_W_2, F0_H_3)
        with BuildLine():
            Line((-31, 28.3), (-31, 25))
            Line((-31, 25), (-27.7, 25))
            Line((-27.7, 25), (-27.7, 31.3))
            Line((-27.7, 31.3), (-29.5, 31.3))
            ThreePointArc((-29.5, 31.3), (-31.6213203436, 30.4213203436), (-32.5, 28.3))
            Line((-32.5, 28.3), (-31, 28.3))
        make_face()
        with BuildLine():
            Line((-22.3, 25), (-19, 25))
            Line((-19, 25), (-19, 28.3))
            Line((-19, 28.3), (-17.5, 28.3))
            ThreePointArc((-17.5, 28.3), (-18.3786796564, 30.4213203436), (-20.5, 31.3))
            Line((-20.5, 31.3), (-22.3, 31.3))
            Line((-22.3, 31.3), (-22.3, 25))
        make_face()
        with BuildLine():
            Line((19, 25), (22.3, 25))
            Line((22.3, 25), (22.3, 31.3))
            Line((22.3, 31.3), (20.5, 31.3))
            ThreePointArc((20.5, 31.3), (18.3786796564, 30.4213203436), (17.5, 28.3))
            Line((17.5, 28.3), (19, 28.3))
            Line((19, 28.3), (19, 25))
        make_face()
        with BuildLine():
            Line((27.7, 25), (31, 25))
            Line((31, 25), (31, 28.3))
            Line((31, 28.3), (32.5, 28.3))
            ThreePointArc((32.5, 28.3), (31.6213203436, 30.4213203436), (29.5, 31.3))
            Line((29.5, 31.3), (27.7, 31.3))
            Line((27.7, 31.3), (27.7, 25))
        make_face()
    extrude(amount=F1_DEPTH, both=True)


solid = f1.part
